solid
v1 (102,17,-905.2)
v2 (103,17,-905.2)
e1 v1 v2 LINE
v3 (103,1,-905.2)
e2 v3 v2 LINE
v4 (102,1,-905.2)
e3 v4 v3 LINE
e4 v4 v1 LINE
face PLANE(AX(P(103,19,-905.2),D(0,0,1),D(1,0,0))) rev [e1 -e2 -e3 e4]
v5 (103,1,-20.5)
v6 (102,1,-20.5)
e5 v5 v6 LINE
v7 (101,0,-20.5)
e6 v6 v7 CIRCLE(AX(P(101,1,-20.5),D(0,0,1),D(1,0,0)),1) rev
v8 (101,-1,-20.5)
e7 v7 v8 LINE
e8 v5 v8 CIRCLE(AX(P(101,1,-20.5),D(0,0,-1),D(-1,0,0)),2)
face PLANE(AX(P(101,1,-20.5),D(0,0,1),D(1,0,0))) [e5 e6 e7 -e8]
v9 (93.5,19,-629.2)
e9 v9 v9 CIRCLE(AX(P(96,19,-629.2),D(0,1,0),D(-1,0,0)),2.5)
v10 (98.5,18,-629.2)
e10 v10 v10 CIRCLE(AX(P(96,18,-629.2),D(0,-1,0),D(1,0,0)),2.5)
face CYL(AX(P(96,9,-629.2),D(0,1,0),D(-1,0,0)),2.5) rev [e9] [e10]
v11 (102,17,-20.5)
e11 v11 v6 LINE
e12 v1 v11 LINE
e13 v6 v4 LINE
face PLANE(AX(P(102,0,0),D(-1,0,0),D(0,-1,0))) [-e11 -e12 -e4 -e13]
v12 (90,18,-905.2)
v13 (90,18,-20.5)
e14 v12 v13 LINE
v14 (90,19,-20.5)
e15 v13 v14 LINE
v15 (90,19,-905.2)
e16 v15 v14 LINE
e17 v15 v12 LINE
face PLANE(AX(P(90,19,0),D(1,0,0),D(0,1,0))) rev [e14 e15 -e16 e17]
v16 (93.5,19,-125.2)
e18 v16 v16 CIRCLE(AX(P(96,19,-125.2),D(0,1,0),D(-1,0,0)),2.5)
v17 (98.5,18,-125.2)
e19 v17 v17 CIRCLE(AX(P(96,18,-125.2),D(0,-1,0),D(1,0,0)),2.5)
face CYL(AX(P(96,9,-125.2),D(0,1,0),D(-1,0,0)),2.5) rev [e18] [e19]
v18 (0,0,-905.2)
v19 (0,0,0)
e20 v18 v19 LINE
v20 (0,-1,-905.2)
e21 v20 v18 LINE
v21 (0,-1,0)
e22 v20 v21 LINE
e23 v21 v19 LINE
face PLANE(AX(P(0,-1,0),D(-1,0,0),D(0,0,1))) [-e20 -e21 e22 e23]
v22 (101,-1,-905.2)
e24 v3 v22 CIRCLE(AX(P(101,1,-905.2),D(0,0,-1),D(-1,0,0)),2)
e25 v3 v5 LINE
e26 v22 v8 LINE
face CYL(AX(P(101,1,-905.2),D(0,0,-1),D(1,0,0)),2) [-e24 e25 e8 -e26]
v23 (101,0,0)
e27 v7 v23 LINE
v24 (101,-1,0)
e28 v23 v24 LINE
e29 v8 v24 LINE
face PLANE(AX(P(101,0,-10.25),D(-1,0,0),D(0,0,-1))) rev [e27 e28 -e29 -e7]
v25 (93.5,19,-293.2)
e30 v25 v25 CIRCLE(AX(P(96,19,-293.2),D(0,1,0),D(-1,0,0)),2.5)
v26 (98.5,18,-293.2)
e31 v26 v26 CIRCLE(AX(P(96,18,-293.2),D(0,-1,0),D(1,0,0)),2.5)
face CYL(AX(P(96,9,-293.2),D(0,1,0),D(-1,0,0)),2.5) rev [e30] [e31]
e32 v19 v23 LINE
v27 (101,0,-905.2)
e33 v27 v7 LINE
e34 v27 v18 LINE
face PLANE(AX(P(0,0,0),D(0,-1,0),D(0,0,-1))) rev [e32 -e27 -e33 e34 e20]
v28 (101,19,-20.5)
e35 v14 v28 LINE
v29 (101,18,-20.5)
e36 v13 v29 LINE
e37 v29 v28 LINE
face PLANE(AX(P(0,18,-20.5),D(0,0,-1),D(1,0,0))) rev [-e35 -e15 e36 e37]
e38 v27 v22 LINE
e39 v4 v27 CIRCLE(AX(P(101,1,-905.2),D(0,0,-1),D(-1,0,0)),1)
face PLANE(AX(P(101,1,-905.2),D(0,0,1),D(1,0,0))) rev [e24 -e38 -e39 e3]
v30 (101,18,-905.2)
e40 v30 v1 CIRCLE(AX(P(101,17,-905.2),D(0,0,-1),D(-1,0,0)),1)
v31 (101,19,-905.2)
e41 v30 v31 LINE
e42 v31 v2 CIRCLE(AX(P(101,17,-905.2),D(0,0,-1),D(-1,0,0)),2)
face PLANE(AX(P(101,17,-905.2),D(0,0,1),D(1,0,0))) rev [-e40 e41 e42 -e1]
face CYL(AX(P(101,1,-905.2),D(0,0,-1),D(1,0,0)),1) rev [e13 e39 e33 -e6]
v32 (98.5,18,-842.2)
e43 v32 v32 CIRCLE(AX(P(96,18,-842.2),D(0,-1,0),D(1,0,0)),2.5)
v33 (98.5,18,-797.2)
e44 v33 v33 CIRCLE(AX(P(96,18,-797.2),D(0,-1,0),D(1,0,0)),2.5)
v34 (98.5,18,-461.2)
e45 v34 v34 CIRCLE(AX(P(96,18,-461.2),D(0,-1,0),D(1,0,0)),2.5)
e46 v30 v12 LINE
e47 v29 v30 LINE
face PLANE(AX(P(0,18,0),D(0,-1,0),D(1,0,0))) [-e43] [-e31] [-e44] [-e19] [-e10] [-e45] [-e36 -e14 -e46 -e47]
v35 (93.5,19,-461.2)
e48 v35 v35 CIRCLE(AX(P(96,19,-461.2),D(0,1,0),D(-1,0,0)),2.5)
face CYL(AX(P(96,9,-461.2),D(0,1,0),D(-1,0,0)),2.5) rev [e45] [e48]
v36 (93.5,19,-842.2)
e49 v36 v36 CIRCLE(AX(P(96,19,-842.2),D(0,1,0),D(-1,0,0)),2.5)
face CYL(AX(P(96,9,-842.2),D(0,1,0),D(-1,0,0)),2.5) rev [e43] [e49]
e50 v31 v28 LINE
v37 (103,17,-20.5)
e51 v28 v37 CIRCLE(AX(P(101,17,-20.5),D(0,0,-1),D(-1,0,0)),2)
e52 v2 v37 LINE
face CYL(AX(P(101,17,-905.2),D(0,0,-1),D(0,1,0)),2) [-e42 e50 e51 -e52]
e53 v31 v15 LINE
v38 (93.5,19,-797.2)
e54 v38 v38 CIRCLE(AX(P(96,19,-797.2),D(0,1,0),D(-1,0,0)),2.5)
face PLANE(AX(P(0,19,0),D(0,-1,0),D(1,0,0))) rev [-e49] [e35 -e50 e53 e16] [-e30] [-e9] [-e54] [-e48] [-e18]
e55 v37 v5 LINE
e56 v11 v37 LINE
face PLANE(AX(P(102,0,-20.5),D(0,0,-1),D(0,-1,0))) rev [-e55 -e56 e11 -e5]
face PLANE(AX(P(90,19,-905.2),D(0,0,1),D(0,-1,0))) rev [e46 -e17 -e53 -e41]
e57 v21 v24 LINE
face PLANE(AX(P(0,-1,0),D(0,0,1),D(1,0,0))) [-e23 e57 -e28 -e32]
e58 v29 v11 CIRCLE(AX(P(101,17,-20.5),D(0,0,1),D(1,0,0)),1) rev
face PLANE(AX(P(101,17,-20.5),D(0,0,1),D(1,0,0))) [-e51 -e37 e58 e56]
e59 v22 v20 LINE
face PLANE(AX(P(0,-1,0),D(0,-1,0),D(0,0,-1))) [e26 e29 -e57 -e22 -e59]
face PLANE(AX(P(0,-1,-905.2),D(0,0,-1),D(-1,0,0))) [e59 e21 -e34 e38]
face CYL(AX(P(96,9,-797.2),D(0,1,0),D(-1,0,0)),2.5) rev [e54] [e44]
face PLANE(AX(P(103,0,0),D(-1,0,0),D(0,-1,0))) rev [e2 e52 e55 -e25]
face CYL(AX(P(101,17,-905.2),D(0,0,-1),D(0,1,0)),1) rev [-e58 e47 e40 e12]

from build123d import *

# Parameters (mm, degrees)
SKETCH1_W                    = 103
SKETCH1_H                    = 905.2
BASE_FLANGE1_DEPTH           = 1
EDGE_FLANGE1_STRIP_W         = 6
EDGE_FLANGE1_STRIP_H         = 1
EDGE_FLANGE1_STRIP_CUT_DEPTH = 905.2
EDGE_FLANGE1_DEPTH           = 905.2
EDGE_FLANGE2_STRIP_W         = 6
EDGE_FLANGE2_STRIP_H         = 1
EDGE_FLANGE2_STRIP_CUT_DEPTH = 905.2
EDGE_FLANGE2_DEPTH           = 905.2
SKETCH19_R                   = 2.5
CUT_EXTRUDE2_DEPTH           = 10
CUT_EXTRUDE3_START           = -20.5
CUT_EXTRUDE3_DEPTH           = 20.5


# Read off the part's stored shape, not the designer's step: Cut-Extrude3
# Sheet-metal steps are written as plain solids
with BuildPart() as part:
    # Sketch1 → Base-Flange1 (new body)
    with BuildSketch(Plane(origin=(0, 0, 0), x_dir=(1, 0, 0), z_dir=(0, 1, 0))):
        with Locations((51.5, 452.6)):
            Rectangle(SKETCH1_W, SKETCH1_H)
    extrude(amount=-BASE_FLANGE1_DEPTH)

    # Edge-Flange1 strip (across the edge) → Edge-Flange1 strip cut (cut)
    with BuildSketch(Plane(origin=(103, 0, 0), x_dir=(-1, 0, 0), z_dir=(0, 0, -1))):
        with Locations((-1, -0.5)):
            Rectangle(EDGE_FLANGE1_STRIP_W, EDGE_FLANGE1_STRIP_H)
    extrude(amount=EDGE_FLANGE1_STRIP_CUT_DEPTH, mode=Mode.SUBTRACT)

    # Edge-Flange1 section (across the edge) → Edge-Flange1 (add)
    with BuildSketch(Plane(origin=(103, 0, 0), x_dir=(-1, 0, 0), z_dir=(0, 0, -1))):
        with BuildLine():
            Line((0, 1), (0, 19))
            Line((0, 19), (1, 19))
            Line((1, 19), (1, 1))
            ThreePointArc((1, 1), (1.292893219, 0.292893219), (2, 0))
            Line((2, 0), (2, -1))
            ThreePointArc((2, -1), (0.585786438, -0.414213562), (0, 1))
        make_face()
    extrude(amount=EDGE_FLANGE1_DEPTH)

    # Edge-Flange2 strip (across the edge) → Edge-Flange2 strip cut (cut)
    with BuildSketch(Plane(origin=(102, 19, 0), x_dir=(0, -1, 0), z_dir=(0, 0, -1))):
        with Locations((-1, -0.5)):
            Rectangle(EDGE_FLANGE2_STRIP_W, EDGE_FLANGE2_STRIP_H)
    extrude(amount=EDGE_FLANGE2_STRIP_CUT_DEPTH, mode=Mode.SUBTRACT)

    # Edge-Flange2 section (across the edge) → Edge-Flange2 (add)
    with BuildSketch(Plane(origin=(102, 19, 0), x_dir=(0, -1, 0), z_dir=(0, 0, -1))):
        with BuildLine():
            Line((0, 1), (0, 12))
            Line((0, 12), (1, 12))
            Line((1, 12), (1, 1))
            ThreePointArc((1, 1), (1.292893219, 0.292893219), (2, 0))
            Line((2, 0), (2, -1))
            ThreePointArc((2, -1), (0.585786438, -0.414213562), (0, 1))
        make_face()
    extrude(amount=EDGE_FLANGE2_DEPTH)

    # Sketch19 → Cut-Extrude2 (cut)
    with BuildSketch(Plane(origin=(0, 19, 0), x_dir=(1, 0, 0), z_dir=(0, 1, 0))):
        with Locations(Location((96, 842.2, 0), (0, 0, 180))):
            Circle(SKETCH19_R)
        with Locations(Location((96, 797.2, 0), (0, 0, 180))):
            Circle(SKETCH19_R)
        with Locations(Location((96, 629.2, 0), (0, 0, 180))):
            Circle(SKETCH19_R)
        with Locations(Location((96, 461.2, 0), (0, 0, 180))):
            Circle(SKETCH19_R)
        with Locations(Location((96, 293.2, 0), (0, 0, 180))):
            Circle(SKETCH19_R)
        with Locations(Location((96, 125.2, 0), (0, 0, 180))):
            Circle(SKETCH19_R)
    extrude(amount=-CUT_EXTRUDE2_DEPTH, mode=Mode.SUBTRACT)

    # Cut-Extrude3 outline → Cut-Extrude3 (cut)
    with BuildSketch(Plane.XY.offset(CUT_EXTRUDE3_START)):
        with BuildLine():
            ThreePointArc((102, 1), (101.707106781, 0.292893219), (101, 0))
            Line((101, 0), (101, -1))
            ThreePointArc((101, -1), (102.414213562, -0.414213562), (103, 1))
            Line((103, 1), (103, 17))
            ThreePointArc((103, 17), (102.414213562, 18.414213562), (101, 19))
            Line((101, 19), (90, 19))
            Line((90, 19), (90, 18))
            Line((90, 18), (101, 18))
            ThreePointArc((101, 18), (101.707106781, 17.707106781), (102, 17))
            Line((102, 17), (102, 1))
        make_face()
    extrude(amount=CUT_EXTRUDE3_DEPTH, mode=Mode.SUBTRACT)


solid = part.part
